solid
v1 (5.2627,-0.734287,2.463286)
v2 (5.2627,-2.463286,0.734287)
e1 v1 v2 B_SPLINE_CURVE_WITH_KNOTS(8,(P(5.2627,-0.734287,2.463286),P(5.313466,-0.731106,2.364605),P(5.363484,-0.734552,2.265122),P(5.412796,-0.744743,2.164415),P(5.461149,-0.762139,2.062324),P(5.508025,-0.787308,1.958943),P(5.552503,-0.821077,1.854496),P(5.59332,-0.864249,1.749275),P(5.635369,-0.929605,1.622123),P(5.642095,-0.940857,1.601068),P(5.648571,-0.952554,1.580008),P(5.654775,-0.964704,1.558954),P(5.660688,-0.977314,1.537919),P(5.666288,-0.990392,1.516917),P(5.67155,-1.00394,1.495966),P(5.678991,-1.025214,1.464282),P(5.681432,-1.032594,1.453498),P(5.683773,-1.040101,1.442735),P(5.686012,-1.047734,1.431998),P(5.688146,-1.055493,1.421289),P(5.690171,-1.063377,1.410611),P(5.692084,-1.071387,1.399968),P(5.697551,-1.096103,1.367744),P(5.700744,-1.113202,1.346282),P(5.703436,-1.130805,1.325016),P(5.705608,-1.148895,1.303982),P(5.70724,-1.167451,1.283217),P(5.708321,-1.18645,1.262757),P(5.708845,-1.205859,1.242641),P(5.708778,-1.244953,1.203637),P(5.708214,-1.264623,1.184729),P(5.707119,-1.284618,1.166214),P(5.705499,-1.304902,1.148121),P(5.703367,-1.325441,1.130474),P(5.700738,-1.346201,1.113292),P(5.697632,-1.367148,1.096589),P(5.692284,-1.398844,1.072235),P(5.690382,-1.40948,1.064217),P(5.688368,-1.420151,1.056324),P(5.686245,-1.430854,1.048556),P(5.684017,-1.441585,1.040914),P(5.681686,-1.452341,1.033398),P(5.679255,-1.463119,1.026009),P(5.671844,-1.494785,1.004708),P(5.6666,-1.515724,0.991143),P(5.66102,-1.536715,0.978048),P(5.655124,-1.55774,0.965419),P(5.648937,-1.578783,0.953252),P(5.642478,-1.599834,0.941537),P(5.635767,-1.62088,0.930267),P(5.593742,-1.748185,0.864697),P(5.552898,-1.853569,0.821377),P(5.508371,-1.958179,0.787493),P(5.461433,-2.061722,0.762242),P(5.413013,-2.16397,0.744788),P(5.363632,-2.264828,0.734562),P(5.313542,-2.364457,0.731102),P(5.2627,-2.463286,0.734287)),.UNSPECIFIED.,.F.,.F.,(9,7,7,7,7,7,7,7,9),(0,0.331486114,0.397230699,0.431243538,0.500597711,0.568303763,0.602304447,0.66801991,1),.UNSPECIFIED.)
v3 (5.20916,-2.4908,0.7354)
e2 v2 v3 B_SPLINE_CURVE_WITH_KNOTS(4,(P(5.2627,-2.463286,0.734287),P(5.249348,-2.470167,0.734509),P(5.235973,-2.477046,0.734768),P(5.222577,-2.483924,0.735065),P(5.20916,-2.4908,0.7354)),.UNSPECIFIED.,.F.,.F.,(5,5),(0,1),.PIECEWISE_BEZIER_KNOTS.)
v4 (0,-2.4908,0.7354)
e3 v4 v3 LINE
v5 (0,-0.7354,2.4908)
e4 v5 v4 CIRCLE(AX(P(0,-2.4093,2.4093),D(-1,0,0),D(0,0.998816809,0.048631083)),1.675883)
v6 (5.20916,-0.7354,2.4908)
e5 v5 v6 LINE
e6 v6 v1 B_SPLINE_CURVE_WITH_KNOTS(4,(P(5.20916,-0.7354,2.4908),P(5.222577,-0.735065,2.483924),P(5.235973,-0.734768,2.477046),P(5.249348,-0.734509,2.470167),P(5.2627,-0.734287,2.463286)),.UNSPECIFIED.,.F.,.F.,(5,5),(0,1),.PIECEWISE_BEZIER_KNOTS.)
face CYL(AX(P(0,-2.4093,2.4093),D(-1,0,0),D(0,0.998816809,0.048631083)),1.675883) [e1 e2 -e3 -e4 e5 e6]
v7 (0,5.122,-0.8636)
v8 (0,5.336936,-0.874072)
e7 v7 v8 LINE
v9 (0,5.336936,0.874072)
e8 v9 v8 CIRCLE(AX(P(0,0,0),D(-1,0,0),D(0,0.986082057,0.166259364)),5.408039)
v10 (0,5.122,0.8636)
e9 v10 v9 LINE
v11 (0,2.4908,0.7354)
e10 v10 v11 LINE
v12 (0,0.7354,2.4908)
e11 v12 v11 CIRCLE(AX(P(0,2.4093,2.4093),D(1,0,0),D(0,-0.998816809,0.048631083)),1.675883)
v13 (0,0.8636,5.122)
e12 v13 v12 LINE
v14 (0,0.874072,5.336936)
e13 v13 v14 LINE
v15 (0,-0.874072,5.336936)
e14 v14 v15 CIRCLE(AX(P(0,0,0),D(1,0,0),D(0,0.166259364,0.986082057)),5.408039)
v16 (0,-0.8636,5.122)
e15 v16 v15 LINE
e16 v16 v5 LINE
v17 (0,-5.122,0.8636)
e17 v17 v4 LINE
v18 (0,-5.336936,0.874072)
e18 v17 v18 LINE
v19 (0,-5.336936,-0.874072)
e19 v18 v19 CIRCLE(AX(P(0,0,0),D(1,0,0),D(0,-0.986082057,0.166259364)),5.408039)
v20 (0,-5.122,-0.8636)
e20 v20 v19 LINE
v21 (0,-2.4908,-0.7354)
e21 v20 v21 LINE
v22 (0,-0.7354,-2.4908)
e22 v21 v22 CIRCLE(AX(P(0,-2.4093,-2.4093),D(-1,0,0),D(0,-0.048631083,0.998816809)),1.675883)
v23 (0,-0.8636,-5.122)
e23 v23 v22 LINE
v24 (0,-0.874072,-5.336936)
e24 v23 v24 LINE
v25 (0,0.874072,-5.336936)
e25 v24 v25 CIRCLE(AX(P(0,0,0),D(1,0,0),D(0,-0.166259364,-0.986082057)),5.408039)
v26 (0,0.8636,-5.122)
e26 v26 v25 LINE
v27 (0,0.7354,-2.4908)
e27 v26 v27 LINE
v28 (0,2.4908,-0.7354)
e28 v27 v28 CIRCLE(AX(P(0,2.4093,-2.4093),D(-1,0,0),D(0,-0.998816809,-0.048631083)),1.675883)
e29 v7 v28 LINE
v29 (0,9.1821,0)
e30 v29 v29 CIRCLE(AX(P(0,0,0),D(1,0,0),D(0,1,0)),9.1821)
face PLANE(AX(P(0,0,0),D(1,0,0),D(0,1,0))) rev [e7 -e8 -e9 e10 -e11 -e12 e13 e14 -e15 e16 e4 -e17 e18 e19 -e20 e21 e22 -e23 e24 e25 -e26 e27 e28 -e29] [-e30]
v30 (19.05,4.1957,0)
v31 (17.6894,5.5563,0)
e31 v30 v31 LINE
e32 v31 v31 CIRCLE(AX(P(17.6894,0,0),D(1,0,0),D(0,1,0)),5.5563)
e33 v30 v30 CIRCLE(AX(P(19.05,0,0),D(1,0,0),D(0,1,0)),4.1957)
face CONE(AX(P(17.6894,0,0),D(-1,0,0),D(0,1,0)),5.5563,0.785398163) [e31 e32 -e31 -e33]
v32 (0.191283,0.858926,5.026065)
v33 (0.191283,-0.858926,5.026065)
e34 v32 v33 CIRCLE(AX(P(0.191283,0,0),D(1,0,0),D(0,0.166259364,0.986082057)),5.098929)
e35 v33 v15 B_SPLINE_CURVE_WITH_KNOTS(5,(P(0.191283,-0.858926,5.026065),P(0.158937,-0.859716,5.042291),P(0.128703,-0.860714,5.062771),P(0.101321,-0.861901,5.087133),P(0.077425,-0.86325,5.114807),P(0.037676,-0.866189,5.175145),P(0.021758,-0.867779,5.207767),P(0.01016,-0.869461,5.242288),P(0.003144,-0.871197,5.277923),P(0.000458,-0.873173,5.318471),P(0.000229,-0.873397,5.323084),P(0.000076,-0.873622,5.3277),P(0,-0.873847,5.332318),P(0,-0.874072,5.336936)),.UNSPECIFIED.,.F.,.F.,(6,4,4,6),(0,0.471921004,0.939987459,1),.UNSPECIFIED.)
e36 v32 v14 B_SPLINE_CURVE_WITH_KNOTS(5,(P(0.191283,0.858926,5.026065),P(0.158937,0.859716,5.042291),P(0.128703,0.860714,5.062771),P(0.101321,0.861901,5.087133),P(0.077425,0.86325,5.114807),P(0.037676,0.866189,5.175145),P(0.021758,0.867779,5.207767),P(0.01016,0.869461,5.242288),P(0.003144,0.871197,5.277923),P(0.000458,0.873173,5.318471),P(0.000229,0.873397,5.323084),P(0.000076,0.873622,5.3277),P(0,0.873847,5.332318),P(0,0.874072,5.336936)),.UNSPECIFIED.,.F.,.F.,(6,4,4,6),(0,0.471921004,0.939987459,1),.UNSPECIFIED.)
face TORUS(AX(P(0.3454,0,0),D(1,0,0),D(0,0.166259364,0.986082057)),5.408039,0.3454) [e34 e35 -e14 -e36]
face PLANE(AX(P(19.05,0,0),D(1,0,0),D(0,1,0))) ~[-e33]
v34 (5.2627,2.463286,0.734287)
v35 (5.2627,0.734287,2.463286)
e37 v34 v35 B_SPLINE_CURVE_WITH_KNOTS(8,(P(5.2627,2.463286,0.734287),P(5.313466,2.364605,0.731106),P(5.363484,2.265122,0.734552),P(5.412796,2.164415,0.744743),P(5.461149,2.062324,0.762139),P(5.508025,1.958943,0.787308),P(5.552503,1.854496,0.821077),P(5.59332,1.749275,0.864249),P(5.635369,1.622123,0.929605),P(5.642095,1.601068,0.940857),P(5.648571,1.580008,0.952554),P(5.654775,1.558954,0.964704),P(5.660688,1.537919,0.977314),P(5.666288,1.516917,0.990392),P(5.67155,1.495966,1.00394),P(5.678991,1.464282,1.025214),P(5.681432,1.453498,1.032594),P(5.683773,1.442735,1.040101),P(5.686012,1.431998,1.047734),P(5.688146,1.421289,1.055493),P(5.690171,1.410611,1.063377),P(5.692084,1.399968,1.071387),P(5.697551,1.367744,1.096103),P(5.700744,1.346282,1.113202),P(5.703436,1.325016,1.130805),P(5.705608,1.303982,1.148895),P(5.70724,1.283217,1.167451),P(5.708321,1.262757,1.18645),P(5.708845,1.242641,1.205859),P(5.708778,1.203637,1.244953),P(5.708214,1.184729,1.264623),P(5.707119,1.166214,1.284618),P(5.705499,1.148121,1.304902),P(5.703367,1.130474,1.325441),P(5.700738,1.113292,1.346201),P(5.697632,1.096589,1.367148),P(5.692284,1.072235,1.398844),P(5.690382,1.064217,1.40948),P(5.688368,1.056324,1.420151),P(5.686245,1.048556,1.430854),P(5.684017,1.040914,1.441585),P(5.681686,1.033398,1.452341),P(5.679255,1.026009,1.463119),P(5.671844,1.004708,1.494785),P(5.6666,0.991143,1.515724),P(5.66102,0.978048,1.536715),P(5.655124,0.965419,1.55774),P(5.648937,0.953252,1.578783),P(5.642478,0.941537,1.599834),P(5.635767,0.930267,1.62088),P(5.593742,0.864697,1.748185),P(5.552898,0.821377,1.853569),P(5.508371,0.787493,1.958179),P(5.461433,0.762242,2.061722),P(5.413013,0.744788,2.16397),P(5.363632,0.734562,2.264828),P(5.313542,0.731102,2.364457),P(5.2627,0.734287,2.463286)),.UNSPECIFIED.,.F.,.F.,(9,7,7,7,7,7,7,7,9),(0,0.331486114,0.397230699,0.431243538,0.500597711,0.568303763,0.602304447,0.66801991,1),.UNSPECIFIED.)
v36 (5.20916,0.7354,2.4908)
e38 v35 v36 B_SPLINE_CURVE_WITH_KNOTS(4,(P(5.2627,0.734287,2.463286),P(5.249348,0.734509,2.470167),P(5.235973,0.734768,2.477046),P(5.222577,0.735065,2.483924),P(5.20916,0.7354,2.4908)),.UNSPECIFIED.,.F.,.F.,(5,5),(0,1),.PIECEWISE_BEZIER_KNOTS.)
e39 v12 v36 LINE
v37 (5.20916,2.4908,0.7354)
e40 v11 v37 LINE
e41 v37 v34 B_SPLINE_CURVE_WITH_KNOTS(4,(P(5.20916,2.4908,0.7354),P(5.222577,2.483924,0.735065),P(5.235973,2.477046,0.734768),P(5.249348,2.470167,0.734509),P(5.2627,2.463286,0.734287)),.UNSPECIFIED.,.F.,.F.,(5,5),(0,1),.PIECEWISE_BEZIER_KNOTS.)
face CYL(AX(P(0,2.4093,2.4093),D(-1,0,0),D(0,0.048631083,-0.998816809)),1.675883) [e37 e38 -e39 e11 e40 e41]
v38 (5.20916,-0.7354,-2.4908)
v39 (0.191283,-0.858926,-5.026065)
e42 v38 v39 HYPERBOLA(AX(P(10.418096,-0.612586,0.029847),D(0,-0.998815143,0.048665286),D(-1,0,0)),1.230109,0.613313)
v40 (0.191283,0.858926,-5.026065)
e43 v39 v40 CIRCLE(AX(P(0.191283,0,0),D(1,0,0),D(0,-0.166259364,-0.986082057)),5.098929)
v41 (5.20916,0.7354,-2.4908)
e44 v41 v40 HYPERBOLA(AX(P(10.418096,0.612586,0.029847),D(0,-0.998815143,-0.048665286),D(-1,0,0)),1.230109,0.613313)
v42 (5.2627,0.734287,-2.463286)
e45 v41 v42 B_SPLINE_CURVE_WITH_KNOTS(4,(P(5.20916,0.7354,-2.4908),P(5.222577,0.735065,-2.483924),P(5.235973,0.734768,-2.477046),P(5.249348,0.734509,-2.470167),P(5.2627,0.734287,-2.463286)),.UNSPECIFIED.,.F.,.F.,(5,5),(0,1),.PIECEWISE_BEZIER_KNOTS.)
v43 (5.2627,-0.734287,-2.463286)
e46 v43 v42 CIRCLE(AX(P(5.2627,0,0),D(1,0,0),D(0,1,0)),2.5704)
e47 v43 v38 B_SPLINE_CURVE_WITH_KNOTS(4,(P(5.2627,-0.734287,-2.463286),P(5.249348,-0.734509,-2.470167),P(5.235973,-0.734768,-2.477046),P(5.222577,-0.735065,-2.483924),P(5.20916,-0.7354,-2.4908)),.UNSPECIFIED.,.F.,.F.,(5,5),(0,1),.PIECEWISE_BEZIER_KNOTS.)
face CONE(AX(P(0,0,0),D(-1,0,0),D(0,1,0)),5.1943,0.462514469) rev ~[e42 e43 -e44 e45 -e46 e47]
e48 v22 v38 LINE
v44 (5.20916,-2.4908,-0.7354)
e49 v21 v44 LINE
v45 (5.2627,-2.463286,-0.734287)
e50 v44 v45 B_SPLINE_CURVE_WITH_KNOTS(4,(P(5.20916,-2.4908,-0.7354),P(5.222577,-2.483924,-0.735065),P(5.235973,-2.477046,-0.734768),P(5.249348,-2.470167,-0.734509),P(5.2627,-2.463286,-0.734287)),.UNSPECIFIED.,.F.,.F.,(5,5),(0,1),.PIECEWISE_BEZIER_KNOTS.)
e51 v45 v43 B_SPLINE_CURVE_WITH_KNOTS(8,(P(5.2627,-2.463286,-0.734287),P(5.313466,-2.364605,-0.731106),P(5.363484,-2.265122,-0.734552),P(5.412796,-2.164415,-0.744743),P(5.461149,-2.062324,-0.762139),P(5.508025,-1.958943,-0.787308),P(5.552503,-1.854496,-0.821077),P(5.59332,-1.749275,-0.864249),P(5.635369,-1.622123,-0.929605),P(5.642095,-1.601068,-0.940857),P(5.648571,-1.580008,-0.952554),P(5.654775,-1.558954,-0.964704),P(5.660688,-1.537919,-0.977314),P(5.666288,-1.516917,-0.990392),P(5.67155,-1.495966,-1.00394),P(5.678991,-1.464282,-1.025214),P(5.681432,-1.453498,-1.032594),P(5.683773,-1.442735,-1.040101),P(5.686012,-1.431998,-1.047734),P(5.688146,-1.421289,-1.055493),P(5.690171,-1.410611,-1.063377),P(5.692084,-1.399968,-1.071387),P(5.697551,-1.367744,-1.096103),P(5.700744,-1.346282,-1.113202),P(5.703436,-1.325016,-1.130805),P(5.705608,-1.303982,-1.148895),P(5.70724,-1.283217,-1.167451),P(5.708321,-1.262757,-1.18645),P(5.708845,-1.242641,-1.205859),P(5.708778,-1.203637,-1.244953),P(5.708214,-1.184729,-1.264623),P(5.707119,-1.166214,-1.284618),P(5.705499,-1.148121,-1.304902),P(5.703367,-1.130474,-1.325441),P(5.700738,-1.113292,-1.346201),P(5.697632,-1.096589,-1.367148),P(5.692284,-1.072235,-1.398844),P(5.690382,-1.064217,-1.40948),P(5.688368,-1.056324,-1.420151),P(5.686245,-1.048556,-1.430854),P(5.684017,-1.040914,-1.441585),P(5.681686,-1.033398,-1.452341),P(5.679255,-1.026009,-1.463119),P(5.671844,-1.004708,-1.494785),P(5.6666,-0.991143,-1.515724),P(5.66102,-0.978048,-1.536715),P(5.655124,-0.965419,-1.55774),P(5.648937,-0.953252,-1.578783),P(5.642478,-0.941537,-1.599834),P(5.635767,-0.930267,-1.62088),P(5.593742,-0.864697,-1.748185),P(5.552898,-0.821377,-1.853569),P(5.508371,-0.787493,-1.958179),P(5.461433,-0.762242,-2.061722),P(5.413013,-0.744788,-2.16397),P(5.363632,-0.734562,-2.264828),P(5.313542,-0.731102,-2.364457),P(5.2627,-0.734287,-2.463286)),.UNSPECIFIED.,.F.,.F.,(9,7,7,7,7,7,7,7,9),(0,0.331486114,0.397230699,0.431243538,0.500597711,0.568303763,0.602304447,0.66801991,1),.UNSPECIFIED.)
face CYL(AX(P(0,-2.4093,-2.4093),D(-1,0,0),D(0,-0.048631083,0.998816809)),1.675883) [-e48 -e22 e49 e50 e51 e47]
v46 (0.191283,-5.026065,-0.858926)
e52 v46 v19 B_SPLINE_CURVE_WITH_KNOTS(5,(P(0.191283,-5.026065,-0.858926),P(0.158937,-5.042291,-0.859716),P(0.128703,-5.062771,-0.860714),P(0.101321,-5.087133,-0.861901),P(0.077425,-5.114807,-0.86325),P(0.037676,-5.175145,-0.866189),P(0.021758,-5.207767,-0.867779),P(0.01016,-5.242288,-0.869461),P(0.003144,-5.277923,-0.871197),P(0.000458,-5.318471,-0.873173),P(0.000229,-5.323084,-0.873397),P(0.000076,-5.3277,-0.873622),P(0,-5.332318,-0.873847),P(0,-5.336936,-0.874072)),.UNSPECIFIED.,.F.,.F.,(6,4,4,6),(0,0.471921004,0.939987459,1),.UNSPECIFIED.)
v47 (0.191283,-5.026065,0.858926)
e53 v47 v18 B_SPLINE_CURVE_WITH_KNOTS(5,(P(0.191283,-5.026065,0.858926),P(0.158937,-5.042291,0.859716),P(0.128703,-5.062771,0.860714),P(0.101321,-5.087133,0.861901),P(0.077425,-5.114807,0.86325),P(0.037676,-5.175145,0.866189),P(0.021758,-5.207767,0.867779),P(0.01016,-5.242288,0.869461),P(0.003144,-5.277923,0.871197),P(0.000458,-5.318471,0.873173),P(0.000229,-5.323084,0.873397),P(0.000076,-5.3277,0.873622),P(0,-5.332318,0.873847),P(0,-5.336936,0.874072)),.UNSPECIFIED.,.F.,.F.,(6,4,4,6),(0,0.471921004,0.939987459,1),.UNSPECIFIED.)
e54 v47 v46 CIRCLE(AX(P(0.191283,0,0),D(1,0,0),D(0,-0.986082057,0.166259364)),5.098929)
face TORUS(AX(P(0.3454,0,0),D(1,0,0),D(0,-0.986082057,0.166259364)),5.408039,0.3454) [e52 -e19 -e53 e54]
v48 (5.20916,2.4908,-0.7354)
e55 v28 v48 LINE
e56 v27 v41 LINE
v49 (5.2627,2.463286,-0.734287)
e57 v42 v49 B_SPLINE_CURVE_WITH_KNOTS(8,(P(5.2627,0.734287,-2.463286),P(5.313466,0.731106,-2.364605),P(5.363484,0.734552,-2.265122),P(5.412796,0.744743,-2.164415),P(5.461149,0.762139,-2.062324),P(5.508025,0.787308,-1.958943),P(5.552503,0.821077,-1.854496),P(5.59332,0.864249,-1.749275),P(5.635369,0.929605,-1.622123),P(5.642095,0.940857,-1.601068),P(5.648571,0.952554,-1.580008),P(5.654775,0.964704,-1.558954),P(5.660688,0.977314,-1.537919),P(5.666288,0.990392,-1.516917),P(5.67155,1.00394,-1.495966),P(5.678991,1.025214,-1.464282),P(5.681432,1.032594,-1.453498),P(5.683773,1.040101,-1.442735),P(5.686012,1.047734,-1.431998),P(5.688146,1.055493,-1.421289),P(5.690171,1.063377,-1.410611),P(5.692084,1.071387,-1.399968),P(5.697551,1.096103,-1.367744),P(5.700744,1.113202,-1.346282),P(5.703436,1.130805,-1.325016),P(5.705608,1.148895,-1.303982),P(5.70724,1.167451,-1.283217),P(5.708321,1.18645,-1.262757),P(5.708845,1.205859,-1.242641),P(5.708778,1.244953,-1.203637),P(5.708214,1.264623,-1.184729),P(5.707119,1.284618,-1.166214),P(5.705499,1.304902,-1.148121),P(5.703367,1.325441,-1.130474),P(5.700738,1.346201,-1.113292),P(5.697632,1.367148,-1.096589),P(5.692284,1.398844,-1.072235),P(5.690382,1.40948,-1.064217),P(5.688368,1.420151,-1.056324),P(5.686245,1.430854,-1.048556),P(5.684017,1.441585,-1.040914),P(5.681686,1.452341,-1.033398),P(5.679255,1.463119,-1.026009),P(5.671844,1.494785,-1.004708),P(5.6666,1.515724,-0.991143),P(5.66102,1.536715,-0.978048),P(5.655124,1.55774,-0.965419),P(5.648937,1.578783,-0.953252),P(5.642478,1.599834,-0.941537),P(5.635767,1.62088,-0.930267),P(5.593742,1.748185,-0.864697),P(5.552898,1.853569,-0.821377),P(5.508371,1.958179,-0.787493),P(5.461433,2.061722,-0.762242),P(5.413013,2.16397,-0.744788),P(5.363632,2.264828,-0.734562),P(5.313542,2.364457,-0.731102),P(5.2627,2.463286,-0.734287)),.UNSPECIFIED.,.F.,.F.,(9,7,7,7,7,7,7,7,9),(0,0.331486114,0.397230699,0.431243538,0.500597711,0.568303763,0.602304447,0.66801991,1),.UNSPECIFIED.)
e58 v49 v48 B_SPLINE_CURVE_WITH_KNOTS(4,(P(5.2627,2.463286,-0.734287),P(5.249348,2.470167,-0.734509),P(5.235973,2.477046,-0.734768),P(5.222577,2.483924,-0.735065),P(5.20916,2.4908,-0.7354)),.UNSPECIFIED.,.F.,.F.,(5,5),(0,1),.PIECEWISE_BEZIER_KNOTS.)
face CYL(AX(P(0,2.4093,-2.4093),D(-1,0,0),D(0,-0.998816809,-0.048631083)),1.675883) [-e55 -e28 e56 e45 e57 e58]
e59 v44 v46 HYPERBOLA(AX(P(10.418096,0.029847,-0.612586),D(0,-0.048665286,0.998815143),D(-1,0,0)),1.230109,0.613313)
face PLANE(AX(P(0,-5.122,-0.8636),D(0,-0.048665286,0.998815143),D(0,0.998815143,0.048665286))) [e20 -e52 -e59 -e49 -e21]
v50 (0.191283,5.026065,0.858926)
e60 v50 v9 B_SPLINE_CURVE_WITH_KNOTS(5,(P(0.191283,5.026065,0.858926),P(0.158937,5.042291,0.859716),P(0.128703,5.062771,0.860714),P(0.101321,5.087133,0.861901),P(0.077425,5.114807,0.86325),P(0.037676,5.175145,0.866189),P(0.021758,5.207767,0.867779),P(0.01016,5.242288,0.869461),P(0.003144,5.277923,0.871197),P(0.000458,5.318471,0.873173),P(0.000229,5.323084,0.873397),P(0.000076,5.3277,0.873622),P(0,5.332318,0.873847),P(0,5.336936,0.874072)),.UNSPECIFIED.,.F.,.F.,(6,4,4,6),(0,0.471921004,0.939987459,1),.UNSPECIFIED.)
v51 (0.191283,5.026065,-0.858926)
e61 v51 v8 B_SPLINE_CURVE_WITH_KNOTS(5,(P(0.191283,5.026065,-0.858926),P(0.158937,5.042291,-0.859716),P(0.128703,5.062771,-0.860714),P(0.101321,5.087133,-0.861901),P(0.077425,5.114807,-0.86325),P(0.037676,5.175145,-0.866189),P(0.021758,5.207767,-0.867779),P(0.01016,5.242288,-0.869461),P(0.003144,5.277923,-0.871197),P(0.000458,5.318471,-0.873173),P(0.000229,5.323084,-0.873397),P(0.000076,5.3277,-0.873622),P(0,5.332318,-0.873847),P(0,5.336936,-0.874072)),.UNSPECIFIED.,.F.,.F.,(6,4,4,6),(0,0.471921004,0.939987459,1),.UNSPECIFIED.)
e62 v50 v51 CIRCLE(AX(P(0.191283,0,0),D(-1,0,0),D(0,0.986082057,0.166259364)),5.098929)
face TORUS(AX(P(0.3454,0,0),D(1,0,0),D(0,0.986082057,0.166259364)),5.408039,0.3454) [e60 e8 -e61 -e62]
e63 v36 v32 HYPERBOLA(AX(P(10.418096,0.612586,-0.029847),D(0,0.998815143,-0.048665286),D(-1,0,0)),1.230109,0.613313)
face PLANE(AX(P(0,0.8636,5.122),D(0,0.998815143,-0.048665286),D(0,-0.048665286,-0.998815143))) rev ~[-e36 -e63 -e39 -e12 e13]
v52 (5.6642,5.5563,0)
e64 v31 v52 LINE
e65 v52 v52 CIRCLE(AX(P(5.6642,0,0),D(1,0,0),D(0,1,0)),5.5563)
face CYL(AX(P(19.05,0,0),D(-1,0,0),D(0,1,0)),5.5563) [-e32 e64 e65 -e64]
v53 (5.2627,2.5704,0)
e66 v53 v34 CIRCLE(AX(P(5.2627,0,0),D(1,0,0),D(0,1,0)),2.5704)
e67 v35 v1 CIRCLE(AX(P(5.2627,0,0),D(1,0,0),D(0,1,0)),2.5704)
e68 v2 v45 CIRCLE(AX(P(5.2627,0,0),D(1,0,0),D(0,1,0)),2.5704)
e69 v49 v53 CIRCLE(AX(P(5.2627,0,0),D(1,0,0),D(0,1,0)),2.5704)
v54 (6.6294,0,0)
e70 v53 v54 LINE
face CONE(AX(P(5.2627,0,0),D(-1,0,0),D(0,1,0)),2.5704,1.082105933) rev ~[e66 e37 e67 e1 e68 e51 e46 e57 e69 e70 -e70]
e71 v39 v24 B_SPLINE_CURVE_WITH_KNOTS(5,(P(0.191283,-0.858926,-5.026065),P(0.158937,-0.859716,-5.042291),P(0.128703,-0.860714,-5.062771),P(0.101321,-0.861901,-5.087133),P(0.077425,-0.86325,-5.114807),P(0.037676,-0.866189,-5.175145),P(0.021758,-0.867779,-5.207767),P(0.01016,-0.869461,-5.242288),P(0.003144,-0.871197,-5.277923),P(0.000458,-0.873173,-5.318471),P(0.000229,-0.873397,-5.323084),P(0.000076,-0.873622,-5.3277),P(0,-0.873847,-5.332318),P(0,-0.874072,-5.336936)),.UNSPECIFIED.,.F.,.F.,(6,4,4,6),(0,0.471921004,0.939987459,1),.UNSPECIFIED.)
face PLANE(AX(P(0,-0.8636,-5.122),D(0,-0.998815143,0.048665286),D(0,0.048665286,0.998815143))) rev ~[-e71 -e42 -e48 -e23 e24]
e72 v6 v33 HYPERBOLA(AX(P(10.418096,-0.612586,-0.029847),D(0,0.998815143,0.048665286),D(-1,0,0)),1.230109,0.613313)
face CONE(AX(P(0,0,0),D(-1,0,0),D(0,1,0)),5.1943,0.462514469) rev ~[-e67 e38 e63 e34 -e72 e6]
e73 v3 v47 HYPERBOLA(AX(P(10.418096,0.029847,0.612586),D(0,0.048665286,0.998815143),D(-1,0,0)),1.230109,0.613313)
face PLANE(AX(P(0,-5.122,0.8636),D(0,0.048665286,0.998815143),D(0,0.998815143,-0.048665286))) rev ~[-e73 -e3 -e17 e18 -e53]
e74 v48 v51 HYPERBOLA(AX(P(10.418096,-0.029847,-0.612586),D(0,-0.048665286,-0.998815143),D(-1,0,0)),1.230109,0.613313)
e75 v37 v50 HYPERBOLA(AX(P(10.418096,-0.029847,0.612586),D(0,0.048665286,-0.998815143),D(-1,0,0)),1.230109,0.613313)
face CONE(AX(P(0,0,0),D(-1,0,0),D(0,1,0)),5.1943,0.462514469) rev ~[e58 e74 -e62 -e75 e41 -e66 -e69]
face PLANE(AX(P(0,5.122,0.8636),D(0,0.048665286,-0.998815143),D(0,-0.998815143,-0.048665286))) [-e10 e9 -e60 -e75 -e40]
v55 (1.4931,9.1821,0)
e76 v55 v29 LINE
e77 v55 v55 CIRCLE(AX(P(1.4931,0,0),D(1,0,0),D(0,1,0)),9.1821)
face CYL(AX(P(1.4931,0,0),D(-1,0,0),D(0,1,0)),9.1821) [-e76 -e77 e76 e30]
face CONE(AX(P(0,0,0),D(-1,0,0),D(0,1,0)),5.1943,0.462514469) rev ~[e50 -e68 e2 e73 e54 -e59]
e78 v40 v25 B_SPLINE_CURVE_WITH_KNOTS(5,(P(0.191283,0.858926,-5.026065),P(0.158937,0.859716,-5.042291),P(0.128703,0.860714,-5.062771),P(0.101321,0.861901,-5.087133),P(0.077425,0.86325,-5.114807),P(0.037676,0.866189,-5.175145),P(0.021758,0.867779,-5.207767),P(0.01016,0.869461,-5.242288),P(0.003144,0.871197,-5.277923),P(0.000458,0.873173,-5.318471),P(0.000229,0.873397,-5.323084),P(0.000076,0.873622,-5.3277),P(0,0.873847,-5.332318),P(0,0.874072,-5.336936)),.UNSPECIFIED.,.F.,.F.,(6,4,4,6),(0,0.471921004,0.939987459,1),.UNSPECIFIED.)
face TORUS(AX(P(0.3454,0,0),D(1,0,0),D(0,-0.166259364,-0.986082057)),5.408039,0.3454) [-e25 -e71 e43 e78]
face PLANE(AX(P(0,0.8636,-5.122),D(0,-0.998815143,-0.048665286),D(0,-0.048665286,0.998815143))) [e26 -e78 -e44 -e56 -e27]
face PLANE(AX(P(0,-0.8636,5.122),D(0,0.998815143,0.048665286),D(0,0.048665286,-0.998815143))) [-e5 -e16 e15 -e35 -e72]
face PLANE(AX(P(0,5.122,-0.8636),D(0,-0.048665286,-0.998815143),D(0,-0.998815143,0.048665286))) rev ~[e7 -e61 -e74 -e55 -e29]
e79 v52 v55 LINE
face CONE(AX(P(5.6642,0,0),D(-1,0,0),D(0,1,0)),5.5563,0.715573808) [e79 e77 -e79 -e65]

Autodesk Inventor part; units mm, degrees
ref_plane "YZ Plane" through (0, 0, 0) normal (1, 0, 0) x (0, 1, 0)
ref_plane "XZ Plane" through (0, 0, 0) normal (0, 1, 0) x (-1, 0, 0)
sketch "Sketch1" plane through (0, 0, 0) normal (0, 0, 1) x (1, 0, 0)
  line L0 (6.6294, 0) -> (19.05, 0)
  line L1 (19.05, 0) -> (19.05, 5.5563)
  line L2 (19.05, 5.5563) -> (5.6642, 5.5563)
  line L3 (1.4931, 9.1821) -> (0, 9.1821)
  line L4 (-3.81, 0) -> (22.86, 0) projected
  line L5 (0, -1.8364) -> (0, 11.0185) projected
  line L6 (0, 5.1943) -> (5.2627, 2.5704)
  line L7 (5.2627, 2.5704) -> (6.6294, 0)
  line L8 (5.6642, 5.5563) -> (1.4931, 9.1821)
  line L9 (0, 9.1821) -> (0, 5.1943)
  dimension "d2" = 11.1125
  dimension "d3" = 18.3642
  dimension "d4" = 6.6294
  dimension "d5" = 10.3886
  dimension "d6" = 26.5
  dimension "d7" = 62
  dimension "d13" = 41
  dimension "d14" = 5.6642
  dimension "d15" = 19.05
revolve "Body" add sketch "Sketch1" angle 360 about axis through (6.6294, 0, 0) along (1, 0, 0) contours L7 L6 L5 L3 L8 L2 L1 L0
sketch "Sketch2" plane through (0, 0, 0) normal (-1, 0, 0) x (0, 0, 1)
  line L0 (0, -12.8549) -> (0, 12.8549) projected
  line L1 (-12.8549, 0) -> (12.8549, 0) projected
  line L2 (0, 5.1943) -> (0, 0) construction
  line L3 (0, 0) -> (5.1943, 0) construction
  arc A0 (1.7314, 0) -> (0, 1.7314) centre (0, 0) ccw
  line L4 (0, 0) -> (0.7947, 0.7947) construction
  arc A1 (2.5971, 0) -> (0, 2.5971) centre (0, 0) ccw construction
  line L5 (0.8636, 5.122) -> (0.7354, 2.4908)
  line L6 (5.122, 0.8636) -> (2.4908, 0.7354)
  arc A2 (0.7354, 2.4908) -> (2.4908, 0.7354) centre (2.4093, 2.4093) ccw
  arc A3 (5.1943, 0) -> (5.122, 0.8636) centre (0, 0) ccw
  arc A4 (0.8636, 5.122) -> (0, 5.1943) centre (0, 0) ccw
  arc A5 (5.122, 0.8636) -> (0.8636, 5.122) centre (0, 0) ccw
  line L7 (0.8636, -5.122) -> (0.7354, -2.4908)
  line L8 (5.122, -0.8636) -> (2.4908, -0.7354)
  arc A6 (2.4908, -0.7354) -> (0.7354, -2.4908) centre (2.4093, -2.4093) ccw
  arc A7 (5.122, -0.8636) -> (5.1943, 0) centre (0, 0) ccw
  arc A8 (0, -5.1943) -> (0.8636, -5.122) centre (0, 0) ccw
  arc A9 (0.8636, -5.122) -> (5.122, -0.8636) centre (0, 0) ccw
  line L9 (-0.8636, 5.122) -> (-0.7354, 2.4908)
  line L10 (-5.122, 0.8636) -> (-2.4908, 0.7354)
  arc A10 (-2.4908, 0.7354) -> (-0.7354, 2.4908) centre (-2.4093, 2.4093) ccw
  arc A11 (-5.122, 0.8636) -> (-5.1943, 0) centre (0, 0) ccw
  arc A12 (0, 5.1943) -> (-0.8636, 5.122) centre (0, 0) ccw
  arc A13 (-0.8636, 5.122) -> (-5.122, 0.8636) centre (0, 0) ccw
  arc A14 (-5.122, -0.8636) -> (-0.8636, -5.122) centre (0, 0) ccw
  arc A15 (-0.8636, -5.122) -> (0, -5.1943) centre (0, 0) ccw
  arc A16 (-5.1943, 0) -> (-5.122, -0.8636) centre (0, 0) ccw
  line L11 (-5.122, -0.8636) -> (-2.4908, -0.7354)
  arc A17 (-0.7354, -2.4908) -> (-2.4908, -0.7354) centre (-2.4093, -2.4093) ccw
  line L12 (-0.8636, -5.122) -> (-0.7354, -2.4908)
  dimension "d18" = 45
  dimension "d19" = 3.4629
  dimension "d20" = 5.1943
  dimension "d21" = 10.3886
  dimension "d22" = 0.8636
extrude "Slot" add sketch "Sketch2" against normal up to next contours A2 L5 A5 L6 | L9 A10 L10 A13 | L7 A6 L8 A9 | A14 L11 A17 L12
fillet "Fillet1" radius 0.3454 4 edges at (0, 5.1943, 0) (0, 0, 5.1943) (0, -5.1943, 0) (0, 0, -5.1943)
thread "Thread" size "7/16-14 UNC" class "2A" standard "ANSI Unified Screw Threads" length 8.8506
chamfer "Chamfer1" distance 1.3606 distance2 1.3606 1 edges at (19.05, -5.5563, 0) measured on face at (19.05, -1.3863, -1.2282)
ref_plane "Work Plane2" through (2.032, 0, 0) normal (0, 1, 0) x (1, 0, 0)
equation "\"d2\" = GD"
equation "\"d3\" = KOD"
equation "\"d4\" = INTI"
equation "\"d5\" = SDM"
equation "\"d13\" = 0.5 * SEWI"
equation "\"d14\" = KOH"
equation "\"d15\" = NLG"
equation "\"d19\" = 0.333333 * SDM"
equation "\"d20\" = 0.5 * SDM"
equation "\"d21\" = SDM"
equation "\"d22\" = 0.5 * SBR"
equation "\"d45\" = INTI"
equation "\"d25\" = 0.2 * SBR"
equation "\"d9\" = GEL"
equation "\"d11\" = -0.5 * SPD + 0.5 * GD"
equation "\"d12\" = GUL"
equation "\"GD\" = NND"
equation "\"NLG\" = 19.05"
equation "\"GEL\" = 8.85063"
equation "\"KOD\" = 18.3642"
equation "\"KOH\" = 5.6642"
equation "\"SDM\" = 10.3886"
equation "\"INTI\" = 6.6294"
equation "\"SBR\" = 1.7272"
equation "\"GUL\" = 0.75 * GAL"
equation "\"SPD\" = 8.3914"
equation "\"SEWI\" = 82deg"
equation "\"d0\" = NLG"
equation "\"d1\" = KOH"
equation "\"d17\" = SDM"
equation "\"TOA\" = 30deg"
equation "\"THREADDIA\" = 11.1125"
equation "\"BDM\" = NND"
equation "\"NND\" = 11.1125"
equation "\"GAL\" = 1.81407"
equation "\"GD1\" = SPD"
properties part number "ANSI B18.6.3 - 7/16-14 x 3/4, CRFCHMSTII(5)" material "Steel, Mild"
